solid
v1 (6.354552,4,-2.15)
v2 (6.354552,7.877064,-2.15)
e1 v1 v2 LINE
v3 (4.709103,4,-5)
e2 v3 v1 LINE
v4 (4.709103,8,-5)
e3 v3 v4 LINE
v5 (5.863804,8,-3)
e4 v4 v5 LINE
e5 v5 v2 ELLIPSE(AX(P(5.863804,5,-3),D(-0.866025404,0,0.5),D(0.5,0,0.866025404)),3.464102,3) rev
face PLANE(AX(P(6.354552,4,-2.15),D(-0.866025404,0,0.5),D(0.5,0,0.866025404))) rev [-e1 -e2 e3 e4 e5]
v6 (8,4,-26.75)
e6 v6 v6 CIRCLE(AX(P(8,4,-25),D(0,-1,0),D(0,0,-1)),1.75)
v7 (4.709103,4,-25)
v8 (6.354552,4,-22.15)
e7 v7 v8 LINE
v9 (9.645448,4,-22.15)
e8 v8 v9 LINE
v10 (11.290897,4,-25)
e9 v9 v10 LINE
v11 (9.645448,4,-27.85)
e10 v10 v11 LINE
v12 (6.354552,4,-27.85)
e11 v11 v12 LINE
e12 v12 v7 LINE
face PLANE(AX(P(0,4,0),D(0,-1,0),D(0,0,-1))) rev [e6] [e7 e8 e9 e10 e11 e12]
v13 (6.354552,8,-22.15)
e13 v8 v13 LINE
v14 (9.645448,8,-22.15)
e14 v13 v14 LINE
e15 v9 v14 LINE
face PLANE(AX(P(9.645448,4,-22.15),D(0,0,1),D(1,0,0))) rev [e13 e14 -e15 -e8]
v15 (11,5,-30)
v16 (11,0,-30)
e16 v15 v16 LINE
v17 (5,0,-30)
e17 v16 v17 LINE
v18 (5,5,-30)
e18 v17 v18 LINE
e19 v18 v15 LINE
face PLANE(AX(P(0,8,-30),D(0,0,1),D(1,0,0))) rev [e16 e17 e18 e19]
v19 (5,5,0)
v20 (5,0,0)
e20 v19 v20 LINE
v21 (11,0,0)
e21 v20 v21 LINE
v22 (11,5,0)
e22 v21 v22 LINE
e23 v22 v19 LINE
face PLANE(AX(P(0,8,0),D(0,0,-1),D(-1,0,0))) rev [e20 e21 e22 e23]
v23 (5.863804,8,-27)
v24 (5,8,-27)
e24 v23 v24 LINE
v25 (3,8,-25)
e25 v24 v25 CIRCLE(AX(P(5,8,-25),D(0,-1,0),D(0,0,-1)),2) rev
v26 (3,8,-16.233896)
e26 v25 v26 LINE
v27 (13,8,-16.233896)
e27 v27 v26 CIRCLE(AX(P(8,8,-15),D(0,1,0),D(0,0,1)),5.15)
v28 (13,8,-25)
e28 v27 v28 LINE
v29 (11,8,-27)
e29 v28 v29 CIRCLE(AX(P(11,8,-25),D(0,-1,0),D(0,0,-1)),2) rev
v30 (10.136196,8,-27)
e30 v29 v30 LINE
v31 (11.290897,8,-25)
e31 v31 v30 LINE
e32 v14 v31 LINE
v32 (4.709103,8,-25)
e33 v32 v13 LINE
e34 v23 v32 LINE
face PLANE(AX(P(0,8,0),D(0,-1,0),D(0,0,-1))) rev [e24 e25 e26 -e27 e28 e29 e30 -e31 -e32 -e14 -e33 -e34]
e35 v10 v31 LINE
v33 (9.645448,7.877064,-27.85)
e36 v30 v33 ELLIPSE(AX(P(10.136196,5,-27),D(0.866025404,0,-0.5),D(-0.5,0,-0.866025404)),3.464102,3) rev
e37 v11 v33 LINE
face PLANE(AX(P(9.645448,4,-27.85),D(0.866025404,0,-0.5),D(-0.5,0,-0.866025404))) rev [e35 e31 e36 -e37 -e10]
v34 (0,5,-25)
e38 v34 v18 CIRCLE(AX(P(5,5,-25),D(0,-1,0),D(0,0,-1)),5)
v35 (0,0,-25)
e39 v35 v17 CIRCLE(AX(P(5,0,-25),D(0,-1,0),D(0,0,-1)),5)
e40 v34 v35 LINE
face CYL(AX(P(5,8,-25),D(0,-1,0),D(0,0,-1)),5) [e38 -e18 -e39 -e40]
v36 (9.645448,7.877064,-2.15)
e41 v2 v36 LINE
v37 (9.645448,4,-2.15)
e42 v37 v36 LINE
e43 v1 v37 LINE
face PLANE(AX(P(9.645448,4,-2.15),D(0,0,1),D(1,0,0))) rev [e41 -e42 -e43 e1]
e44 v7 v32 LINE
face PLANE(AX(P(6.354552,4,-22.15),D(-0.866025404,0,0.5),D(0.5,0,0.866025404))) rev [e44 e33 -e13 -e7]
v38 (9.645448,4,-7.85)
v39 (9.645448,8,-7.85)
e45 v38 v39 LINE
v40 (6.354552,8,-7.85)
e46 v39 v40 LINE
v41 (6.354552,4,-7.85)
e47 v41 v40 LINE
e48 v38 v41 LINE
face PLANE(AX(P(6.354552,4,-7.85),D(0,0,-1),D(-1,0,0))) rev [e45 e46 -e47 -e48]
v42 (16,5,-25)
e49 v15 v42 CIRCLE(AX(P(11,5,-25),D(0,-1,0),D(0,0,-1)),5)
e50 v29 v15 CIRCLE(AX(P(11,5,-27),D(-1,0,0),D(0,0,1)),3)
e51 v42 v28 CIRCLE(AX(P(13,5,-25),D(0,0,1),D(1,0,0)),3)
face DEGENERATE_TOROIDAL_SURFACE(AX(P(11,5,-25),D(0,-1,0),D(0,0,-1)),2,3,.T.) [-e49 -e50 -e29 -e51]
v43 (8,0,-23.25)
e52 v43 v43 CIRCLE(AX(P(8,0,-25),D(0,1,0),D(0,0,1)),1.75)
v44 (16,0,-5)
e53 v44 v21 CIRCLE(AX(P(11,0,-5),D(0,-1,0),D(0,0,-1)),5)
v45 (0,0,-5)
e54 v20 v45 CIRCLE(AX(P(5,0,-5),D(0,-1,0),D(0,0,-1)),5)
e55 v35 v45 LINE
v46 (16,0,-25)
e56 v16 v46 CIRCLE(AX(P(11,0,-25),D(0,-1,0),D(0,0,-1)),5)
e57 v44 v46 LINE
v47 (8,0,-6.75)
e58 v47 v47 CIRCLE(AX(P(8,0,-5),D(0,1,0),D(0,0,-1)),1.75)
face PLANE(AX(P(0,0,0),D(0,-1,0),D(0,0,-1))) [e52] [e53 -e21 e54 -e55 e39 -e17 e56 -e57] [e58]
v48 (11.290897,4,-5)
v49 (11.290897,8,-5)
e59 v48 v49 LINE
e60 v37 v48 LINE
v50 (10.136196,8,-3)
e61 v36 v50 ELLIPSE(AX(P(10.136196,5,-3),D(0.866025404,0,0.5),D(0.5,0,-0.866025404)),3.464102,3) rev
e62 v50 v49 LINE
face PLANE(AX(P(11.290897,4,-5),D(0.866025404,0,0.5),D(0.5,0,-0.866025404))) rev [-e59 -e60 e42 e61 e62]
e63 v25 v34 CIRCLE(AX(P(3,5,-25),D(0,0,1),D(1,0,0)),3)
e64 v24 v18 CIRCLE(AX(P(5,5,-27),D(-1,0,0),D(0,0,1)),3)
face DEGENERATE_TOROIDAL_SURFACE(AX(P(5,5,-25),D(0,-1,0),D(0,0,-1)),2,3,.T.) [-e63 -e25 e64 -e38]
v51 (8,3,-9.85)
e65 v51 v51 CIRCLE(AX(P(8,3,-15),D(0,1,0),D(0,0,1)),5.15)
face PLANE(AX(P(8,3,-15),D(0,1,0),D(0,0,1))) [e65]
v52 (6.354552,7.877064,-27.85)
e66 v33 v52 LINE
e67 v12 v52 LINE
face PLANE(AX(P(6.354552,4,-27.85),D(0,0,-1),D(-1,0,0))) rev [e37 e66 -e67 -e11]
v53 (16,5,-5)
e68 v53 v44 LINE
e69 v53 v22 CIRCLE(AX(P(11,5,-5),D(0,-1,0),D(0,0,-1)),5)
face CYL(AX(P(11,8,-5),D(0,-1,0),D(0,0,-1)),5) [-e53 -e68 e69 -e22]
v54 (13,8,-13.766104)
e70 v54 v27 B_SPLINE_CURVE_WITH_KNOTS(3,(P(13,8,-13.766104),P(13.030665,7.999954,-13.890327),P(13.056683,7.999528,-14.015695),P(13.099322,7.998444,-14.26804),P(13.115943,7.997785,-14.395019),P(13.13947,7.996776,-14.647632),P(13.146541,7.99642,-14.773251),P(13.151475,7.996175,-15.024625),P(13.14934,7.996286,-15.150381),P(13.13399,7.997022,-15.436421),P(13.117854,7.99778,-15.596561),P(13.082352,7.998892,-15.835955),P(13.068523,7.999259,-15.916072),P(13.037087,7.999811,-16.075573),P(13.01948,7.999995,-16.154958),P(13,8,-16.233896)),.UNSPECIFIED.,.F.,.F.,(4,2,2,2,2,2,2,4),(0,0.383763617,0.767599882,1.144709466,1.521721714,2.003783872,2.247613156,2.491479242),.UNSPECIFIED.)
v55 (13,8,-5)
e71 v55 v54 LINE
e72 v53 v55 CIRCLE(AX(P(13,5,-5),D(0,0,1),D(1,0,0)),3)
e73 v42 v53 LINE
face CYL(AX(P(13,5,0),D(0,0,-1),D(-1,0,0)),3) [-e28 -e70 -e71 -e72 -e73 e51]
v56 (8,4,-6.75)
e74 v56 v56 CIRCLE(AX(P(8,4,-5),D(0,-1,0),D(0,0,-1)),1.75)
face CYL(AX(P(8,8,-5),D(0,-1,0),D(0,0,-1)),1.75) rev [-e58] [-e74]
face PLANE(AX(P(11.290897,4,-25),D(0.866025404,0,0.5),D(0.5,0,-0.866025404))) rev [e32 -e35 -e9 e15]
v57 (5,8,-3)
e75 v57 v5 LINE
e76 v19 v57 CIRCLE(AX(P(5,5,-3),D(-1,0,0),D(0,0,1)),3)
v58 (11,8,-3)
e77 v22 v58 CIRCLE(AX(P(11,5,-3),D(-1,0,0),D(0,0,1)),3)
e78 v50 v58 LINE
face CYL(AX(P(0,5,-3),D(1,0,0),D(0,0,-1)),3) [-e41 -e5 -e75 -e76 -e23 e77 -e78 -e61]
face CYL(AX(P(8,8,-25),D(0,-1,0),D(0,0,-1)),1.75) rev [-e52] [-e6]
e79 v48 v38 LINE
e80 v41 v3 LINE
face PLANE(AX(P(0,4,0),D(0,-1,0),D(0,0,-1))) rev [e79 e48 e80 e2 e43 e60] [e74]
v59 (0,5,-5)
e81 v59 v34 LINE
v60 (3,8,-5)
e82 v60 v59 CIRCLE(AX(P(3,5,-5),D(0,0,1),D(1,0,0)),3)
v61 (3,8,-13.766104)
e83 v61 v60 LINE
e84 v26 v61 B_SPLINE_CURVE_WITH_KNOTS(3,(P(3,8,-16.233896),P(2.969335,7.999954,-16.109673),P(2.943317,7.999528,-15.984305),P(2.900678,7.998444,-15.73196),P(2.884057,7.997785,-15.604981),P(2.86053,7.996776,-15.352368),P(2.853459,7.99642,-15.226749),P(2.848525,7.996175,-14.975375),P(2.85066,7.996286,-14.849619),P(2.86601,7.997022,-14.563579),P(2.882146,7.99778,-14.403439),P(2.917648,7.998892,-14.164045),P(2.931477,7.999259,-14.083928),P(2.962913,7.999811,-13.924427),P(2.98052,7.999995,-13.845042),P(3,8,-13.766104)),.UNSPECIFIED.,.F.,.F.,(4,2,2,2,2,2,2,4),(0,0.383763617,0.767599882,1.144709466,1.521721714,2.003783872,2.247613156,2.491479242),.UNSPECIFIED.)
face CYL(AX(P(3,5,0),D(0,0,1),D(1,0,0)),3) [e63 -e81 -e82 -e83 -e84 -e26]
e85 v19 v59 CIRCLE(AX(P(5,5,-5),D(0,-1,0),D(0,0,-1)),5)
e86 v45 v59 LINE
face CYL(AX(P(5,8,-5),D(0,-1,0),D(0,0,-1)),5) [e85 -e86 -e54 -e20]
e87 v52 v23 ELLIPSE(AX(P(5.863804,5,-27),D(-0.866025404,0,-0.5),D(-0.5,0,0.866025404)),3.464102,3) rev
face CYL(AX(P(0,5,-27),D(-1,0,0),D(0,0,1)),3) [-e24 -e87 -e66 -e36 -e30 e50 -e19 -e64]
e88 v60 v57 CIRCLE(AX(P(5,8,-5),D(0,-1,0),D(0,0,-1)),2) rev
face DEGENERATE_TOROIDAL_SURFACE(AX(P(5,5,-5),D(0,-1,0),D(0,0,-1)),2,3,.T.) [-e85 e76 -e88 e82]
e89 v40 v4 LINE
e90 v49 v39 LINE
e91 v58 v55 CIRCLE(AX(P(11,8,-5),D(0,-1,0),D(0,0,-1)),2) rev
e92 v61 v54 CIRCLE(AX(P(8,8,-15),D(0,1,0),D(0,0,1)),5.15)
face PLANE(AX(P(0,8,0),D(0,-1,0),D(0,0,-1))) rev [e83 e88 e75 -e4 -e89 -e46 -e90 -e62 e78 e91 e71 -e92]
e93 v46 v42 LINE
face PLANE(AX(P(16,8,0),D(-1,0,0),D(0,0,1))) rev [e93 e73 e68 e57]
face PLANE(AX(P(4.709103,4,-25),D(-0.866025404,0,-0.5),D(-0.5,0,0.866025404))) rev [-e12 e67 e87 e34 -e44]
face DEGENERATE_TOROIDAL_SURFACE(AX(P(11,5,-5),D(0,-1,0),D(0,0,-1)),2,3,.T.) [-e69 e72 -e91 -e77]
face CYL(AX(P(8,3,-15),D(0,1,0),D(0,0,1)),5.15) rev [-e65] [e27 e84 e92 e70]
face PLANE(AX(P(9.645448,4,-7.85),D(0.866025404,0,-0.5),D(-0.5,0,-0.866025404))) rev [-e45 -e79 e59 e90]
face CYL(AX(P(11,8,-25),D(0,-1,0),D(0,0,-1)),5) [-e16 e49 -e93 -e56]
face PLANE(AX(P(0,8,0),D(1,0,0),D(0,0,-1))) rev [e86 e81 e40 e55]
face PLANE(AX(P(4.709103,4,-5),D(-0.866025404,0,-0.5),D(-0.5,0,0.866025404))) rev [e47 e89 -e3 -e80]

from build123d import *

# Parameters (mm, degrees)
ESQUISSE1_W             = 16
ESQUISSE1_H             = 30
ESQUISSE1_R             = 1.75
BOSS_EXTRU_1_DEPTH      = 8
ESQUISSE2_R             = 5.15
ENL_V_MAT_EXTRU_1_DEPTH = 5
CONG_1_R                = 5
ENL_V_MAT_EXTRU_2_DEPTH = 4
CONG_2_R                = 3


with BuildPart() as part:
    # Esquisse1 → Boss.-Extru.1 (new body)
    with BuildSketch(Plane(origin=(0, 0, 0), x_dir=(1, 0, 0), z_dir=(0, 1, 0))):
        with Locations((8, 15)):
            Rectangle(ESQUISSE1_W, ESQUISSE1_H)
        with Locations(Location((8, 25, 0), (0, 0, 270))):
            Circle(ESQUISSE1_R, mode=Mode.SUBTRACT)
        with Locations(Location((8, 5, 0), (0, 0, 90))):
            Circle(ESQUISSE1_R, mode=Mode.SUBTRACT)
    extrude(amount=BOSS_EXTRU_1_DEPTH)

    # Esquisse2 → Enlèv. mat.-Extru.1 (cut)
    with BuildSketch(Plane(origin=(0, 8, 0), x_dir=(1, 0, 0), z_dir=(0, 1, 0))):
        with Locations(Location((8, 15, 0), (0, 0, 270))):
            Circle(ESQUISSE2_R)
    extrude(amount=-ENL_V_MAT_EXTRU_1_DEPTH, mode=Mode.SUBTRACT)

    # Congé1
    cong_1_edges = [part.edges().sort_by_distance(p)[0] for p in [
        (0, 4, -30),
        (16, 4, -30),
        (16, 4, 0),
        (0, 4, 0),
    ]]
    fillet(cong_1_edges, radius=CONG_1_R)

    # Esquisse3 → Enlèv. mat.-Extru.2 (cut)
    with BuildSketch(Plane(origin=(0, 8, 0), x_dir=(1, 0, 0), z_dir=(0, 1, 0))):
        Polygon((6.354551733, 27.85), (9.645448267, 27.85), (11.290896534, 25), (9.645448267, 22.15), (6.354551733, 22.15), (4.709103466, 25), align=None)
        Polygon((6.354551733, 7.85), (9.645448267, 7.85), (11.290896534, 5), (9.645448267, 2.15), (6.354551733, 2.15), (4.709103466, 5), align=None)
    extrude(amount=-ENL_V_MAT_EXTRU_2_DEPTH, mode=Mode.SUBTRACT)

    # Congé2
    # the kernel refuses this fillet: 3 mm, written as the material it takes off along each edge
    with BuildSketch(Plane(origin=(5, 8, -5), x_dir=(0, 0, 1), z_dir=(1, 0, 0))) as cong_2_piece_1:
        with BuildLine():
            CenterArc((5 - CONG_2_R, CONG_2_R), CONG_2_R, 270, 90)
            Line((5 - CONG_2_R, 0), (5, 0))
            Line((5, 0), (5, CONG_2_R))
        make_face()
    revolve(axis=Axis((5, 8, -5), (0, -1, 0)), revolution_arc=90, mode=Mode.SUBTRACT)
    with BuildSketch(Plane(origin=(0, 8, -25), x_dir=(1, 0, 0), z_dir=(0, 0, 1)), Plane(origin=(16, 8, -5), x_dir=(-1, 0, 0), z_dir=(0, 0, -1))) as cong_2_piece_2:
        with BuildLine():
            CenterArc((CONG_2_R, -CONG_2_R), CONG_2_R, 90, 90)
            Line((0, -CONG_2_R), (0, 0))
            Line((0, 0), (CONG_2_R, 0))
        make_face()
    extrude(amount=20, mode=Mode.SUBTRACT)
    with BuildSketch(Plane(origin=(5, 8, -25), x_dir=(-1, 0, 0), z_dir=(0, 0, 1))) as cong_2_piece_3:
        with BuildLine():
            CenterArc((5 - CONG_2_R, CONG_2_R), CONG_2_R, 270, 90)
            Line((5, CONG_2_R), (5, 0))
            Line((5, 0), (5 - CONG_2_R, 0))
        make_face()
    revolve(axis=Axis((5, 8, -25), (0, -1, 0)), revolution_arc=90, mode=Mode.SUBTRACT)
    with BuildSketch(Plane(origin=(11, 8, -30), x_dir=(0, 0, 1), z_dir=(-1, 0, 0))) as cong_2_piece_4:
        with BuildLine():
            CenterArc((CONG_2_R, -CONG_2_R), CONG_2_R, 90, 90)
            Line((0, -CONG_2_R), (0, 0))
            Line((0, 0), (CONG_2_R, 0))
        make_face()
    extrude(amount=6, mode=Mode.SUBTRACT)
    with BuildSketch(Plane(origin=(11, 8, -25), x_dir=(1, 0, 0), z_dir=(0, 0, 1))) as cong_2_piece_5:
        with BuildLine():
            CenterArc((5 - CONG_2_R, -CONG_2_R), CONG_2_R, 0, 90)
            Line((5, -CONG_2_R), (5, 0))
            Line((5, 0), (5 - CONG_2_R, 0))
        make_face()
    revolve(axis=Axis((11, 8, -25), (0, 1, 0)), revolution_arc=90, mode=Mode.SUBTRACT)
    with BuildSketch(Plane(origin=(11, 8, -5), x_dir=(0, 0, 1), z_dir=(-1, 0, 0))) as cong_2_piece_6:
        with BuildLine():
            CenterArc((5 - CONG_2_R, -CONG_2_R), CONG_2_R, 0, 90)
            Line((5 - CONG_2_R, 0), (5, 0))
            Line((5, 0), (5, -CONG_2_R))
        make_face()
    revolve(axis=Axis((11, 8, -5), (0, 1, 0)), revolution_arc=90, mode=Mode.SUBTRACT)
    with BuildSketch(Plane(origin=(5, 8, 0), x_dir=(0, -1, 0), z_dir=(1, 0, 0))) as cong_2_piece_7:
        with BuildLine():
            CenterArc((CONG_2_R, CONG_2_R), CONG_2_R, 180, 90)
            Line((0, CONG_2_R), (0, 0))
            Line((0, 0), (CONG_2_R, 0))
        make_face()
    extrude(amount=6, mode=Mode.SUBTRACT)


solid = part.part
